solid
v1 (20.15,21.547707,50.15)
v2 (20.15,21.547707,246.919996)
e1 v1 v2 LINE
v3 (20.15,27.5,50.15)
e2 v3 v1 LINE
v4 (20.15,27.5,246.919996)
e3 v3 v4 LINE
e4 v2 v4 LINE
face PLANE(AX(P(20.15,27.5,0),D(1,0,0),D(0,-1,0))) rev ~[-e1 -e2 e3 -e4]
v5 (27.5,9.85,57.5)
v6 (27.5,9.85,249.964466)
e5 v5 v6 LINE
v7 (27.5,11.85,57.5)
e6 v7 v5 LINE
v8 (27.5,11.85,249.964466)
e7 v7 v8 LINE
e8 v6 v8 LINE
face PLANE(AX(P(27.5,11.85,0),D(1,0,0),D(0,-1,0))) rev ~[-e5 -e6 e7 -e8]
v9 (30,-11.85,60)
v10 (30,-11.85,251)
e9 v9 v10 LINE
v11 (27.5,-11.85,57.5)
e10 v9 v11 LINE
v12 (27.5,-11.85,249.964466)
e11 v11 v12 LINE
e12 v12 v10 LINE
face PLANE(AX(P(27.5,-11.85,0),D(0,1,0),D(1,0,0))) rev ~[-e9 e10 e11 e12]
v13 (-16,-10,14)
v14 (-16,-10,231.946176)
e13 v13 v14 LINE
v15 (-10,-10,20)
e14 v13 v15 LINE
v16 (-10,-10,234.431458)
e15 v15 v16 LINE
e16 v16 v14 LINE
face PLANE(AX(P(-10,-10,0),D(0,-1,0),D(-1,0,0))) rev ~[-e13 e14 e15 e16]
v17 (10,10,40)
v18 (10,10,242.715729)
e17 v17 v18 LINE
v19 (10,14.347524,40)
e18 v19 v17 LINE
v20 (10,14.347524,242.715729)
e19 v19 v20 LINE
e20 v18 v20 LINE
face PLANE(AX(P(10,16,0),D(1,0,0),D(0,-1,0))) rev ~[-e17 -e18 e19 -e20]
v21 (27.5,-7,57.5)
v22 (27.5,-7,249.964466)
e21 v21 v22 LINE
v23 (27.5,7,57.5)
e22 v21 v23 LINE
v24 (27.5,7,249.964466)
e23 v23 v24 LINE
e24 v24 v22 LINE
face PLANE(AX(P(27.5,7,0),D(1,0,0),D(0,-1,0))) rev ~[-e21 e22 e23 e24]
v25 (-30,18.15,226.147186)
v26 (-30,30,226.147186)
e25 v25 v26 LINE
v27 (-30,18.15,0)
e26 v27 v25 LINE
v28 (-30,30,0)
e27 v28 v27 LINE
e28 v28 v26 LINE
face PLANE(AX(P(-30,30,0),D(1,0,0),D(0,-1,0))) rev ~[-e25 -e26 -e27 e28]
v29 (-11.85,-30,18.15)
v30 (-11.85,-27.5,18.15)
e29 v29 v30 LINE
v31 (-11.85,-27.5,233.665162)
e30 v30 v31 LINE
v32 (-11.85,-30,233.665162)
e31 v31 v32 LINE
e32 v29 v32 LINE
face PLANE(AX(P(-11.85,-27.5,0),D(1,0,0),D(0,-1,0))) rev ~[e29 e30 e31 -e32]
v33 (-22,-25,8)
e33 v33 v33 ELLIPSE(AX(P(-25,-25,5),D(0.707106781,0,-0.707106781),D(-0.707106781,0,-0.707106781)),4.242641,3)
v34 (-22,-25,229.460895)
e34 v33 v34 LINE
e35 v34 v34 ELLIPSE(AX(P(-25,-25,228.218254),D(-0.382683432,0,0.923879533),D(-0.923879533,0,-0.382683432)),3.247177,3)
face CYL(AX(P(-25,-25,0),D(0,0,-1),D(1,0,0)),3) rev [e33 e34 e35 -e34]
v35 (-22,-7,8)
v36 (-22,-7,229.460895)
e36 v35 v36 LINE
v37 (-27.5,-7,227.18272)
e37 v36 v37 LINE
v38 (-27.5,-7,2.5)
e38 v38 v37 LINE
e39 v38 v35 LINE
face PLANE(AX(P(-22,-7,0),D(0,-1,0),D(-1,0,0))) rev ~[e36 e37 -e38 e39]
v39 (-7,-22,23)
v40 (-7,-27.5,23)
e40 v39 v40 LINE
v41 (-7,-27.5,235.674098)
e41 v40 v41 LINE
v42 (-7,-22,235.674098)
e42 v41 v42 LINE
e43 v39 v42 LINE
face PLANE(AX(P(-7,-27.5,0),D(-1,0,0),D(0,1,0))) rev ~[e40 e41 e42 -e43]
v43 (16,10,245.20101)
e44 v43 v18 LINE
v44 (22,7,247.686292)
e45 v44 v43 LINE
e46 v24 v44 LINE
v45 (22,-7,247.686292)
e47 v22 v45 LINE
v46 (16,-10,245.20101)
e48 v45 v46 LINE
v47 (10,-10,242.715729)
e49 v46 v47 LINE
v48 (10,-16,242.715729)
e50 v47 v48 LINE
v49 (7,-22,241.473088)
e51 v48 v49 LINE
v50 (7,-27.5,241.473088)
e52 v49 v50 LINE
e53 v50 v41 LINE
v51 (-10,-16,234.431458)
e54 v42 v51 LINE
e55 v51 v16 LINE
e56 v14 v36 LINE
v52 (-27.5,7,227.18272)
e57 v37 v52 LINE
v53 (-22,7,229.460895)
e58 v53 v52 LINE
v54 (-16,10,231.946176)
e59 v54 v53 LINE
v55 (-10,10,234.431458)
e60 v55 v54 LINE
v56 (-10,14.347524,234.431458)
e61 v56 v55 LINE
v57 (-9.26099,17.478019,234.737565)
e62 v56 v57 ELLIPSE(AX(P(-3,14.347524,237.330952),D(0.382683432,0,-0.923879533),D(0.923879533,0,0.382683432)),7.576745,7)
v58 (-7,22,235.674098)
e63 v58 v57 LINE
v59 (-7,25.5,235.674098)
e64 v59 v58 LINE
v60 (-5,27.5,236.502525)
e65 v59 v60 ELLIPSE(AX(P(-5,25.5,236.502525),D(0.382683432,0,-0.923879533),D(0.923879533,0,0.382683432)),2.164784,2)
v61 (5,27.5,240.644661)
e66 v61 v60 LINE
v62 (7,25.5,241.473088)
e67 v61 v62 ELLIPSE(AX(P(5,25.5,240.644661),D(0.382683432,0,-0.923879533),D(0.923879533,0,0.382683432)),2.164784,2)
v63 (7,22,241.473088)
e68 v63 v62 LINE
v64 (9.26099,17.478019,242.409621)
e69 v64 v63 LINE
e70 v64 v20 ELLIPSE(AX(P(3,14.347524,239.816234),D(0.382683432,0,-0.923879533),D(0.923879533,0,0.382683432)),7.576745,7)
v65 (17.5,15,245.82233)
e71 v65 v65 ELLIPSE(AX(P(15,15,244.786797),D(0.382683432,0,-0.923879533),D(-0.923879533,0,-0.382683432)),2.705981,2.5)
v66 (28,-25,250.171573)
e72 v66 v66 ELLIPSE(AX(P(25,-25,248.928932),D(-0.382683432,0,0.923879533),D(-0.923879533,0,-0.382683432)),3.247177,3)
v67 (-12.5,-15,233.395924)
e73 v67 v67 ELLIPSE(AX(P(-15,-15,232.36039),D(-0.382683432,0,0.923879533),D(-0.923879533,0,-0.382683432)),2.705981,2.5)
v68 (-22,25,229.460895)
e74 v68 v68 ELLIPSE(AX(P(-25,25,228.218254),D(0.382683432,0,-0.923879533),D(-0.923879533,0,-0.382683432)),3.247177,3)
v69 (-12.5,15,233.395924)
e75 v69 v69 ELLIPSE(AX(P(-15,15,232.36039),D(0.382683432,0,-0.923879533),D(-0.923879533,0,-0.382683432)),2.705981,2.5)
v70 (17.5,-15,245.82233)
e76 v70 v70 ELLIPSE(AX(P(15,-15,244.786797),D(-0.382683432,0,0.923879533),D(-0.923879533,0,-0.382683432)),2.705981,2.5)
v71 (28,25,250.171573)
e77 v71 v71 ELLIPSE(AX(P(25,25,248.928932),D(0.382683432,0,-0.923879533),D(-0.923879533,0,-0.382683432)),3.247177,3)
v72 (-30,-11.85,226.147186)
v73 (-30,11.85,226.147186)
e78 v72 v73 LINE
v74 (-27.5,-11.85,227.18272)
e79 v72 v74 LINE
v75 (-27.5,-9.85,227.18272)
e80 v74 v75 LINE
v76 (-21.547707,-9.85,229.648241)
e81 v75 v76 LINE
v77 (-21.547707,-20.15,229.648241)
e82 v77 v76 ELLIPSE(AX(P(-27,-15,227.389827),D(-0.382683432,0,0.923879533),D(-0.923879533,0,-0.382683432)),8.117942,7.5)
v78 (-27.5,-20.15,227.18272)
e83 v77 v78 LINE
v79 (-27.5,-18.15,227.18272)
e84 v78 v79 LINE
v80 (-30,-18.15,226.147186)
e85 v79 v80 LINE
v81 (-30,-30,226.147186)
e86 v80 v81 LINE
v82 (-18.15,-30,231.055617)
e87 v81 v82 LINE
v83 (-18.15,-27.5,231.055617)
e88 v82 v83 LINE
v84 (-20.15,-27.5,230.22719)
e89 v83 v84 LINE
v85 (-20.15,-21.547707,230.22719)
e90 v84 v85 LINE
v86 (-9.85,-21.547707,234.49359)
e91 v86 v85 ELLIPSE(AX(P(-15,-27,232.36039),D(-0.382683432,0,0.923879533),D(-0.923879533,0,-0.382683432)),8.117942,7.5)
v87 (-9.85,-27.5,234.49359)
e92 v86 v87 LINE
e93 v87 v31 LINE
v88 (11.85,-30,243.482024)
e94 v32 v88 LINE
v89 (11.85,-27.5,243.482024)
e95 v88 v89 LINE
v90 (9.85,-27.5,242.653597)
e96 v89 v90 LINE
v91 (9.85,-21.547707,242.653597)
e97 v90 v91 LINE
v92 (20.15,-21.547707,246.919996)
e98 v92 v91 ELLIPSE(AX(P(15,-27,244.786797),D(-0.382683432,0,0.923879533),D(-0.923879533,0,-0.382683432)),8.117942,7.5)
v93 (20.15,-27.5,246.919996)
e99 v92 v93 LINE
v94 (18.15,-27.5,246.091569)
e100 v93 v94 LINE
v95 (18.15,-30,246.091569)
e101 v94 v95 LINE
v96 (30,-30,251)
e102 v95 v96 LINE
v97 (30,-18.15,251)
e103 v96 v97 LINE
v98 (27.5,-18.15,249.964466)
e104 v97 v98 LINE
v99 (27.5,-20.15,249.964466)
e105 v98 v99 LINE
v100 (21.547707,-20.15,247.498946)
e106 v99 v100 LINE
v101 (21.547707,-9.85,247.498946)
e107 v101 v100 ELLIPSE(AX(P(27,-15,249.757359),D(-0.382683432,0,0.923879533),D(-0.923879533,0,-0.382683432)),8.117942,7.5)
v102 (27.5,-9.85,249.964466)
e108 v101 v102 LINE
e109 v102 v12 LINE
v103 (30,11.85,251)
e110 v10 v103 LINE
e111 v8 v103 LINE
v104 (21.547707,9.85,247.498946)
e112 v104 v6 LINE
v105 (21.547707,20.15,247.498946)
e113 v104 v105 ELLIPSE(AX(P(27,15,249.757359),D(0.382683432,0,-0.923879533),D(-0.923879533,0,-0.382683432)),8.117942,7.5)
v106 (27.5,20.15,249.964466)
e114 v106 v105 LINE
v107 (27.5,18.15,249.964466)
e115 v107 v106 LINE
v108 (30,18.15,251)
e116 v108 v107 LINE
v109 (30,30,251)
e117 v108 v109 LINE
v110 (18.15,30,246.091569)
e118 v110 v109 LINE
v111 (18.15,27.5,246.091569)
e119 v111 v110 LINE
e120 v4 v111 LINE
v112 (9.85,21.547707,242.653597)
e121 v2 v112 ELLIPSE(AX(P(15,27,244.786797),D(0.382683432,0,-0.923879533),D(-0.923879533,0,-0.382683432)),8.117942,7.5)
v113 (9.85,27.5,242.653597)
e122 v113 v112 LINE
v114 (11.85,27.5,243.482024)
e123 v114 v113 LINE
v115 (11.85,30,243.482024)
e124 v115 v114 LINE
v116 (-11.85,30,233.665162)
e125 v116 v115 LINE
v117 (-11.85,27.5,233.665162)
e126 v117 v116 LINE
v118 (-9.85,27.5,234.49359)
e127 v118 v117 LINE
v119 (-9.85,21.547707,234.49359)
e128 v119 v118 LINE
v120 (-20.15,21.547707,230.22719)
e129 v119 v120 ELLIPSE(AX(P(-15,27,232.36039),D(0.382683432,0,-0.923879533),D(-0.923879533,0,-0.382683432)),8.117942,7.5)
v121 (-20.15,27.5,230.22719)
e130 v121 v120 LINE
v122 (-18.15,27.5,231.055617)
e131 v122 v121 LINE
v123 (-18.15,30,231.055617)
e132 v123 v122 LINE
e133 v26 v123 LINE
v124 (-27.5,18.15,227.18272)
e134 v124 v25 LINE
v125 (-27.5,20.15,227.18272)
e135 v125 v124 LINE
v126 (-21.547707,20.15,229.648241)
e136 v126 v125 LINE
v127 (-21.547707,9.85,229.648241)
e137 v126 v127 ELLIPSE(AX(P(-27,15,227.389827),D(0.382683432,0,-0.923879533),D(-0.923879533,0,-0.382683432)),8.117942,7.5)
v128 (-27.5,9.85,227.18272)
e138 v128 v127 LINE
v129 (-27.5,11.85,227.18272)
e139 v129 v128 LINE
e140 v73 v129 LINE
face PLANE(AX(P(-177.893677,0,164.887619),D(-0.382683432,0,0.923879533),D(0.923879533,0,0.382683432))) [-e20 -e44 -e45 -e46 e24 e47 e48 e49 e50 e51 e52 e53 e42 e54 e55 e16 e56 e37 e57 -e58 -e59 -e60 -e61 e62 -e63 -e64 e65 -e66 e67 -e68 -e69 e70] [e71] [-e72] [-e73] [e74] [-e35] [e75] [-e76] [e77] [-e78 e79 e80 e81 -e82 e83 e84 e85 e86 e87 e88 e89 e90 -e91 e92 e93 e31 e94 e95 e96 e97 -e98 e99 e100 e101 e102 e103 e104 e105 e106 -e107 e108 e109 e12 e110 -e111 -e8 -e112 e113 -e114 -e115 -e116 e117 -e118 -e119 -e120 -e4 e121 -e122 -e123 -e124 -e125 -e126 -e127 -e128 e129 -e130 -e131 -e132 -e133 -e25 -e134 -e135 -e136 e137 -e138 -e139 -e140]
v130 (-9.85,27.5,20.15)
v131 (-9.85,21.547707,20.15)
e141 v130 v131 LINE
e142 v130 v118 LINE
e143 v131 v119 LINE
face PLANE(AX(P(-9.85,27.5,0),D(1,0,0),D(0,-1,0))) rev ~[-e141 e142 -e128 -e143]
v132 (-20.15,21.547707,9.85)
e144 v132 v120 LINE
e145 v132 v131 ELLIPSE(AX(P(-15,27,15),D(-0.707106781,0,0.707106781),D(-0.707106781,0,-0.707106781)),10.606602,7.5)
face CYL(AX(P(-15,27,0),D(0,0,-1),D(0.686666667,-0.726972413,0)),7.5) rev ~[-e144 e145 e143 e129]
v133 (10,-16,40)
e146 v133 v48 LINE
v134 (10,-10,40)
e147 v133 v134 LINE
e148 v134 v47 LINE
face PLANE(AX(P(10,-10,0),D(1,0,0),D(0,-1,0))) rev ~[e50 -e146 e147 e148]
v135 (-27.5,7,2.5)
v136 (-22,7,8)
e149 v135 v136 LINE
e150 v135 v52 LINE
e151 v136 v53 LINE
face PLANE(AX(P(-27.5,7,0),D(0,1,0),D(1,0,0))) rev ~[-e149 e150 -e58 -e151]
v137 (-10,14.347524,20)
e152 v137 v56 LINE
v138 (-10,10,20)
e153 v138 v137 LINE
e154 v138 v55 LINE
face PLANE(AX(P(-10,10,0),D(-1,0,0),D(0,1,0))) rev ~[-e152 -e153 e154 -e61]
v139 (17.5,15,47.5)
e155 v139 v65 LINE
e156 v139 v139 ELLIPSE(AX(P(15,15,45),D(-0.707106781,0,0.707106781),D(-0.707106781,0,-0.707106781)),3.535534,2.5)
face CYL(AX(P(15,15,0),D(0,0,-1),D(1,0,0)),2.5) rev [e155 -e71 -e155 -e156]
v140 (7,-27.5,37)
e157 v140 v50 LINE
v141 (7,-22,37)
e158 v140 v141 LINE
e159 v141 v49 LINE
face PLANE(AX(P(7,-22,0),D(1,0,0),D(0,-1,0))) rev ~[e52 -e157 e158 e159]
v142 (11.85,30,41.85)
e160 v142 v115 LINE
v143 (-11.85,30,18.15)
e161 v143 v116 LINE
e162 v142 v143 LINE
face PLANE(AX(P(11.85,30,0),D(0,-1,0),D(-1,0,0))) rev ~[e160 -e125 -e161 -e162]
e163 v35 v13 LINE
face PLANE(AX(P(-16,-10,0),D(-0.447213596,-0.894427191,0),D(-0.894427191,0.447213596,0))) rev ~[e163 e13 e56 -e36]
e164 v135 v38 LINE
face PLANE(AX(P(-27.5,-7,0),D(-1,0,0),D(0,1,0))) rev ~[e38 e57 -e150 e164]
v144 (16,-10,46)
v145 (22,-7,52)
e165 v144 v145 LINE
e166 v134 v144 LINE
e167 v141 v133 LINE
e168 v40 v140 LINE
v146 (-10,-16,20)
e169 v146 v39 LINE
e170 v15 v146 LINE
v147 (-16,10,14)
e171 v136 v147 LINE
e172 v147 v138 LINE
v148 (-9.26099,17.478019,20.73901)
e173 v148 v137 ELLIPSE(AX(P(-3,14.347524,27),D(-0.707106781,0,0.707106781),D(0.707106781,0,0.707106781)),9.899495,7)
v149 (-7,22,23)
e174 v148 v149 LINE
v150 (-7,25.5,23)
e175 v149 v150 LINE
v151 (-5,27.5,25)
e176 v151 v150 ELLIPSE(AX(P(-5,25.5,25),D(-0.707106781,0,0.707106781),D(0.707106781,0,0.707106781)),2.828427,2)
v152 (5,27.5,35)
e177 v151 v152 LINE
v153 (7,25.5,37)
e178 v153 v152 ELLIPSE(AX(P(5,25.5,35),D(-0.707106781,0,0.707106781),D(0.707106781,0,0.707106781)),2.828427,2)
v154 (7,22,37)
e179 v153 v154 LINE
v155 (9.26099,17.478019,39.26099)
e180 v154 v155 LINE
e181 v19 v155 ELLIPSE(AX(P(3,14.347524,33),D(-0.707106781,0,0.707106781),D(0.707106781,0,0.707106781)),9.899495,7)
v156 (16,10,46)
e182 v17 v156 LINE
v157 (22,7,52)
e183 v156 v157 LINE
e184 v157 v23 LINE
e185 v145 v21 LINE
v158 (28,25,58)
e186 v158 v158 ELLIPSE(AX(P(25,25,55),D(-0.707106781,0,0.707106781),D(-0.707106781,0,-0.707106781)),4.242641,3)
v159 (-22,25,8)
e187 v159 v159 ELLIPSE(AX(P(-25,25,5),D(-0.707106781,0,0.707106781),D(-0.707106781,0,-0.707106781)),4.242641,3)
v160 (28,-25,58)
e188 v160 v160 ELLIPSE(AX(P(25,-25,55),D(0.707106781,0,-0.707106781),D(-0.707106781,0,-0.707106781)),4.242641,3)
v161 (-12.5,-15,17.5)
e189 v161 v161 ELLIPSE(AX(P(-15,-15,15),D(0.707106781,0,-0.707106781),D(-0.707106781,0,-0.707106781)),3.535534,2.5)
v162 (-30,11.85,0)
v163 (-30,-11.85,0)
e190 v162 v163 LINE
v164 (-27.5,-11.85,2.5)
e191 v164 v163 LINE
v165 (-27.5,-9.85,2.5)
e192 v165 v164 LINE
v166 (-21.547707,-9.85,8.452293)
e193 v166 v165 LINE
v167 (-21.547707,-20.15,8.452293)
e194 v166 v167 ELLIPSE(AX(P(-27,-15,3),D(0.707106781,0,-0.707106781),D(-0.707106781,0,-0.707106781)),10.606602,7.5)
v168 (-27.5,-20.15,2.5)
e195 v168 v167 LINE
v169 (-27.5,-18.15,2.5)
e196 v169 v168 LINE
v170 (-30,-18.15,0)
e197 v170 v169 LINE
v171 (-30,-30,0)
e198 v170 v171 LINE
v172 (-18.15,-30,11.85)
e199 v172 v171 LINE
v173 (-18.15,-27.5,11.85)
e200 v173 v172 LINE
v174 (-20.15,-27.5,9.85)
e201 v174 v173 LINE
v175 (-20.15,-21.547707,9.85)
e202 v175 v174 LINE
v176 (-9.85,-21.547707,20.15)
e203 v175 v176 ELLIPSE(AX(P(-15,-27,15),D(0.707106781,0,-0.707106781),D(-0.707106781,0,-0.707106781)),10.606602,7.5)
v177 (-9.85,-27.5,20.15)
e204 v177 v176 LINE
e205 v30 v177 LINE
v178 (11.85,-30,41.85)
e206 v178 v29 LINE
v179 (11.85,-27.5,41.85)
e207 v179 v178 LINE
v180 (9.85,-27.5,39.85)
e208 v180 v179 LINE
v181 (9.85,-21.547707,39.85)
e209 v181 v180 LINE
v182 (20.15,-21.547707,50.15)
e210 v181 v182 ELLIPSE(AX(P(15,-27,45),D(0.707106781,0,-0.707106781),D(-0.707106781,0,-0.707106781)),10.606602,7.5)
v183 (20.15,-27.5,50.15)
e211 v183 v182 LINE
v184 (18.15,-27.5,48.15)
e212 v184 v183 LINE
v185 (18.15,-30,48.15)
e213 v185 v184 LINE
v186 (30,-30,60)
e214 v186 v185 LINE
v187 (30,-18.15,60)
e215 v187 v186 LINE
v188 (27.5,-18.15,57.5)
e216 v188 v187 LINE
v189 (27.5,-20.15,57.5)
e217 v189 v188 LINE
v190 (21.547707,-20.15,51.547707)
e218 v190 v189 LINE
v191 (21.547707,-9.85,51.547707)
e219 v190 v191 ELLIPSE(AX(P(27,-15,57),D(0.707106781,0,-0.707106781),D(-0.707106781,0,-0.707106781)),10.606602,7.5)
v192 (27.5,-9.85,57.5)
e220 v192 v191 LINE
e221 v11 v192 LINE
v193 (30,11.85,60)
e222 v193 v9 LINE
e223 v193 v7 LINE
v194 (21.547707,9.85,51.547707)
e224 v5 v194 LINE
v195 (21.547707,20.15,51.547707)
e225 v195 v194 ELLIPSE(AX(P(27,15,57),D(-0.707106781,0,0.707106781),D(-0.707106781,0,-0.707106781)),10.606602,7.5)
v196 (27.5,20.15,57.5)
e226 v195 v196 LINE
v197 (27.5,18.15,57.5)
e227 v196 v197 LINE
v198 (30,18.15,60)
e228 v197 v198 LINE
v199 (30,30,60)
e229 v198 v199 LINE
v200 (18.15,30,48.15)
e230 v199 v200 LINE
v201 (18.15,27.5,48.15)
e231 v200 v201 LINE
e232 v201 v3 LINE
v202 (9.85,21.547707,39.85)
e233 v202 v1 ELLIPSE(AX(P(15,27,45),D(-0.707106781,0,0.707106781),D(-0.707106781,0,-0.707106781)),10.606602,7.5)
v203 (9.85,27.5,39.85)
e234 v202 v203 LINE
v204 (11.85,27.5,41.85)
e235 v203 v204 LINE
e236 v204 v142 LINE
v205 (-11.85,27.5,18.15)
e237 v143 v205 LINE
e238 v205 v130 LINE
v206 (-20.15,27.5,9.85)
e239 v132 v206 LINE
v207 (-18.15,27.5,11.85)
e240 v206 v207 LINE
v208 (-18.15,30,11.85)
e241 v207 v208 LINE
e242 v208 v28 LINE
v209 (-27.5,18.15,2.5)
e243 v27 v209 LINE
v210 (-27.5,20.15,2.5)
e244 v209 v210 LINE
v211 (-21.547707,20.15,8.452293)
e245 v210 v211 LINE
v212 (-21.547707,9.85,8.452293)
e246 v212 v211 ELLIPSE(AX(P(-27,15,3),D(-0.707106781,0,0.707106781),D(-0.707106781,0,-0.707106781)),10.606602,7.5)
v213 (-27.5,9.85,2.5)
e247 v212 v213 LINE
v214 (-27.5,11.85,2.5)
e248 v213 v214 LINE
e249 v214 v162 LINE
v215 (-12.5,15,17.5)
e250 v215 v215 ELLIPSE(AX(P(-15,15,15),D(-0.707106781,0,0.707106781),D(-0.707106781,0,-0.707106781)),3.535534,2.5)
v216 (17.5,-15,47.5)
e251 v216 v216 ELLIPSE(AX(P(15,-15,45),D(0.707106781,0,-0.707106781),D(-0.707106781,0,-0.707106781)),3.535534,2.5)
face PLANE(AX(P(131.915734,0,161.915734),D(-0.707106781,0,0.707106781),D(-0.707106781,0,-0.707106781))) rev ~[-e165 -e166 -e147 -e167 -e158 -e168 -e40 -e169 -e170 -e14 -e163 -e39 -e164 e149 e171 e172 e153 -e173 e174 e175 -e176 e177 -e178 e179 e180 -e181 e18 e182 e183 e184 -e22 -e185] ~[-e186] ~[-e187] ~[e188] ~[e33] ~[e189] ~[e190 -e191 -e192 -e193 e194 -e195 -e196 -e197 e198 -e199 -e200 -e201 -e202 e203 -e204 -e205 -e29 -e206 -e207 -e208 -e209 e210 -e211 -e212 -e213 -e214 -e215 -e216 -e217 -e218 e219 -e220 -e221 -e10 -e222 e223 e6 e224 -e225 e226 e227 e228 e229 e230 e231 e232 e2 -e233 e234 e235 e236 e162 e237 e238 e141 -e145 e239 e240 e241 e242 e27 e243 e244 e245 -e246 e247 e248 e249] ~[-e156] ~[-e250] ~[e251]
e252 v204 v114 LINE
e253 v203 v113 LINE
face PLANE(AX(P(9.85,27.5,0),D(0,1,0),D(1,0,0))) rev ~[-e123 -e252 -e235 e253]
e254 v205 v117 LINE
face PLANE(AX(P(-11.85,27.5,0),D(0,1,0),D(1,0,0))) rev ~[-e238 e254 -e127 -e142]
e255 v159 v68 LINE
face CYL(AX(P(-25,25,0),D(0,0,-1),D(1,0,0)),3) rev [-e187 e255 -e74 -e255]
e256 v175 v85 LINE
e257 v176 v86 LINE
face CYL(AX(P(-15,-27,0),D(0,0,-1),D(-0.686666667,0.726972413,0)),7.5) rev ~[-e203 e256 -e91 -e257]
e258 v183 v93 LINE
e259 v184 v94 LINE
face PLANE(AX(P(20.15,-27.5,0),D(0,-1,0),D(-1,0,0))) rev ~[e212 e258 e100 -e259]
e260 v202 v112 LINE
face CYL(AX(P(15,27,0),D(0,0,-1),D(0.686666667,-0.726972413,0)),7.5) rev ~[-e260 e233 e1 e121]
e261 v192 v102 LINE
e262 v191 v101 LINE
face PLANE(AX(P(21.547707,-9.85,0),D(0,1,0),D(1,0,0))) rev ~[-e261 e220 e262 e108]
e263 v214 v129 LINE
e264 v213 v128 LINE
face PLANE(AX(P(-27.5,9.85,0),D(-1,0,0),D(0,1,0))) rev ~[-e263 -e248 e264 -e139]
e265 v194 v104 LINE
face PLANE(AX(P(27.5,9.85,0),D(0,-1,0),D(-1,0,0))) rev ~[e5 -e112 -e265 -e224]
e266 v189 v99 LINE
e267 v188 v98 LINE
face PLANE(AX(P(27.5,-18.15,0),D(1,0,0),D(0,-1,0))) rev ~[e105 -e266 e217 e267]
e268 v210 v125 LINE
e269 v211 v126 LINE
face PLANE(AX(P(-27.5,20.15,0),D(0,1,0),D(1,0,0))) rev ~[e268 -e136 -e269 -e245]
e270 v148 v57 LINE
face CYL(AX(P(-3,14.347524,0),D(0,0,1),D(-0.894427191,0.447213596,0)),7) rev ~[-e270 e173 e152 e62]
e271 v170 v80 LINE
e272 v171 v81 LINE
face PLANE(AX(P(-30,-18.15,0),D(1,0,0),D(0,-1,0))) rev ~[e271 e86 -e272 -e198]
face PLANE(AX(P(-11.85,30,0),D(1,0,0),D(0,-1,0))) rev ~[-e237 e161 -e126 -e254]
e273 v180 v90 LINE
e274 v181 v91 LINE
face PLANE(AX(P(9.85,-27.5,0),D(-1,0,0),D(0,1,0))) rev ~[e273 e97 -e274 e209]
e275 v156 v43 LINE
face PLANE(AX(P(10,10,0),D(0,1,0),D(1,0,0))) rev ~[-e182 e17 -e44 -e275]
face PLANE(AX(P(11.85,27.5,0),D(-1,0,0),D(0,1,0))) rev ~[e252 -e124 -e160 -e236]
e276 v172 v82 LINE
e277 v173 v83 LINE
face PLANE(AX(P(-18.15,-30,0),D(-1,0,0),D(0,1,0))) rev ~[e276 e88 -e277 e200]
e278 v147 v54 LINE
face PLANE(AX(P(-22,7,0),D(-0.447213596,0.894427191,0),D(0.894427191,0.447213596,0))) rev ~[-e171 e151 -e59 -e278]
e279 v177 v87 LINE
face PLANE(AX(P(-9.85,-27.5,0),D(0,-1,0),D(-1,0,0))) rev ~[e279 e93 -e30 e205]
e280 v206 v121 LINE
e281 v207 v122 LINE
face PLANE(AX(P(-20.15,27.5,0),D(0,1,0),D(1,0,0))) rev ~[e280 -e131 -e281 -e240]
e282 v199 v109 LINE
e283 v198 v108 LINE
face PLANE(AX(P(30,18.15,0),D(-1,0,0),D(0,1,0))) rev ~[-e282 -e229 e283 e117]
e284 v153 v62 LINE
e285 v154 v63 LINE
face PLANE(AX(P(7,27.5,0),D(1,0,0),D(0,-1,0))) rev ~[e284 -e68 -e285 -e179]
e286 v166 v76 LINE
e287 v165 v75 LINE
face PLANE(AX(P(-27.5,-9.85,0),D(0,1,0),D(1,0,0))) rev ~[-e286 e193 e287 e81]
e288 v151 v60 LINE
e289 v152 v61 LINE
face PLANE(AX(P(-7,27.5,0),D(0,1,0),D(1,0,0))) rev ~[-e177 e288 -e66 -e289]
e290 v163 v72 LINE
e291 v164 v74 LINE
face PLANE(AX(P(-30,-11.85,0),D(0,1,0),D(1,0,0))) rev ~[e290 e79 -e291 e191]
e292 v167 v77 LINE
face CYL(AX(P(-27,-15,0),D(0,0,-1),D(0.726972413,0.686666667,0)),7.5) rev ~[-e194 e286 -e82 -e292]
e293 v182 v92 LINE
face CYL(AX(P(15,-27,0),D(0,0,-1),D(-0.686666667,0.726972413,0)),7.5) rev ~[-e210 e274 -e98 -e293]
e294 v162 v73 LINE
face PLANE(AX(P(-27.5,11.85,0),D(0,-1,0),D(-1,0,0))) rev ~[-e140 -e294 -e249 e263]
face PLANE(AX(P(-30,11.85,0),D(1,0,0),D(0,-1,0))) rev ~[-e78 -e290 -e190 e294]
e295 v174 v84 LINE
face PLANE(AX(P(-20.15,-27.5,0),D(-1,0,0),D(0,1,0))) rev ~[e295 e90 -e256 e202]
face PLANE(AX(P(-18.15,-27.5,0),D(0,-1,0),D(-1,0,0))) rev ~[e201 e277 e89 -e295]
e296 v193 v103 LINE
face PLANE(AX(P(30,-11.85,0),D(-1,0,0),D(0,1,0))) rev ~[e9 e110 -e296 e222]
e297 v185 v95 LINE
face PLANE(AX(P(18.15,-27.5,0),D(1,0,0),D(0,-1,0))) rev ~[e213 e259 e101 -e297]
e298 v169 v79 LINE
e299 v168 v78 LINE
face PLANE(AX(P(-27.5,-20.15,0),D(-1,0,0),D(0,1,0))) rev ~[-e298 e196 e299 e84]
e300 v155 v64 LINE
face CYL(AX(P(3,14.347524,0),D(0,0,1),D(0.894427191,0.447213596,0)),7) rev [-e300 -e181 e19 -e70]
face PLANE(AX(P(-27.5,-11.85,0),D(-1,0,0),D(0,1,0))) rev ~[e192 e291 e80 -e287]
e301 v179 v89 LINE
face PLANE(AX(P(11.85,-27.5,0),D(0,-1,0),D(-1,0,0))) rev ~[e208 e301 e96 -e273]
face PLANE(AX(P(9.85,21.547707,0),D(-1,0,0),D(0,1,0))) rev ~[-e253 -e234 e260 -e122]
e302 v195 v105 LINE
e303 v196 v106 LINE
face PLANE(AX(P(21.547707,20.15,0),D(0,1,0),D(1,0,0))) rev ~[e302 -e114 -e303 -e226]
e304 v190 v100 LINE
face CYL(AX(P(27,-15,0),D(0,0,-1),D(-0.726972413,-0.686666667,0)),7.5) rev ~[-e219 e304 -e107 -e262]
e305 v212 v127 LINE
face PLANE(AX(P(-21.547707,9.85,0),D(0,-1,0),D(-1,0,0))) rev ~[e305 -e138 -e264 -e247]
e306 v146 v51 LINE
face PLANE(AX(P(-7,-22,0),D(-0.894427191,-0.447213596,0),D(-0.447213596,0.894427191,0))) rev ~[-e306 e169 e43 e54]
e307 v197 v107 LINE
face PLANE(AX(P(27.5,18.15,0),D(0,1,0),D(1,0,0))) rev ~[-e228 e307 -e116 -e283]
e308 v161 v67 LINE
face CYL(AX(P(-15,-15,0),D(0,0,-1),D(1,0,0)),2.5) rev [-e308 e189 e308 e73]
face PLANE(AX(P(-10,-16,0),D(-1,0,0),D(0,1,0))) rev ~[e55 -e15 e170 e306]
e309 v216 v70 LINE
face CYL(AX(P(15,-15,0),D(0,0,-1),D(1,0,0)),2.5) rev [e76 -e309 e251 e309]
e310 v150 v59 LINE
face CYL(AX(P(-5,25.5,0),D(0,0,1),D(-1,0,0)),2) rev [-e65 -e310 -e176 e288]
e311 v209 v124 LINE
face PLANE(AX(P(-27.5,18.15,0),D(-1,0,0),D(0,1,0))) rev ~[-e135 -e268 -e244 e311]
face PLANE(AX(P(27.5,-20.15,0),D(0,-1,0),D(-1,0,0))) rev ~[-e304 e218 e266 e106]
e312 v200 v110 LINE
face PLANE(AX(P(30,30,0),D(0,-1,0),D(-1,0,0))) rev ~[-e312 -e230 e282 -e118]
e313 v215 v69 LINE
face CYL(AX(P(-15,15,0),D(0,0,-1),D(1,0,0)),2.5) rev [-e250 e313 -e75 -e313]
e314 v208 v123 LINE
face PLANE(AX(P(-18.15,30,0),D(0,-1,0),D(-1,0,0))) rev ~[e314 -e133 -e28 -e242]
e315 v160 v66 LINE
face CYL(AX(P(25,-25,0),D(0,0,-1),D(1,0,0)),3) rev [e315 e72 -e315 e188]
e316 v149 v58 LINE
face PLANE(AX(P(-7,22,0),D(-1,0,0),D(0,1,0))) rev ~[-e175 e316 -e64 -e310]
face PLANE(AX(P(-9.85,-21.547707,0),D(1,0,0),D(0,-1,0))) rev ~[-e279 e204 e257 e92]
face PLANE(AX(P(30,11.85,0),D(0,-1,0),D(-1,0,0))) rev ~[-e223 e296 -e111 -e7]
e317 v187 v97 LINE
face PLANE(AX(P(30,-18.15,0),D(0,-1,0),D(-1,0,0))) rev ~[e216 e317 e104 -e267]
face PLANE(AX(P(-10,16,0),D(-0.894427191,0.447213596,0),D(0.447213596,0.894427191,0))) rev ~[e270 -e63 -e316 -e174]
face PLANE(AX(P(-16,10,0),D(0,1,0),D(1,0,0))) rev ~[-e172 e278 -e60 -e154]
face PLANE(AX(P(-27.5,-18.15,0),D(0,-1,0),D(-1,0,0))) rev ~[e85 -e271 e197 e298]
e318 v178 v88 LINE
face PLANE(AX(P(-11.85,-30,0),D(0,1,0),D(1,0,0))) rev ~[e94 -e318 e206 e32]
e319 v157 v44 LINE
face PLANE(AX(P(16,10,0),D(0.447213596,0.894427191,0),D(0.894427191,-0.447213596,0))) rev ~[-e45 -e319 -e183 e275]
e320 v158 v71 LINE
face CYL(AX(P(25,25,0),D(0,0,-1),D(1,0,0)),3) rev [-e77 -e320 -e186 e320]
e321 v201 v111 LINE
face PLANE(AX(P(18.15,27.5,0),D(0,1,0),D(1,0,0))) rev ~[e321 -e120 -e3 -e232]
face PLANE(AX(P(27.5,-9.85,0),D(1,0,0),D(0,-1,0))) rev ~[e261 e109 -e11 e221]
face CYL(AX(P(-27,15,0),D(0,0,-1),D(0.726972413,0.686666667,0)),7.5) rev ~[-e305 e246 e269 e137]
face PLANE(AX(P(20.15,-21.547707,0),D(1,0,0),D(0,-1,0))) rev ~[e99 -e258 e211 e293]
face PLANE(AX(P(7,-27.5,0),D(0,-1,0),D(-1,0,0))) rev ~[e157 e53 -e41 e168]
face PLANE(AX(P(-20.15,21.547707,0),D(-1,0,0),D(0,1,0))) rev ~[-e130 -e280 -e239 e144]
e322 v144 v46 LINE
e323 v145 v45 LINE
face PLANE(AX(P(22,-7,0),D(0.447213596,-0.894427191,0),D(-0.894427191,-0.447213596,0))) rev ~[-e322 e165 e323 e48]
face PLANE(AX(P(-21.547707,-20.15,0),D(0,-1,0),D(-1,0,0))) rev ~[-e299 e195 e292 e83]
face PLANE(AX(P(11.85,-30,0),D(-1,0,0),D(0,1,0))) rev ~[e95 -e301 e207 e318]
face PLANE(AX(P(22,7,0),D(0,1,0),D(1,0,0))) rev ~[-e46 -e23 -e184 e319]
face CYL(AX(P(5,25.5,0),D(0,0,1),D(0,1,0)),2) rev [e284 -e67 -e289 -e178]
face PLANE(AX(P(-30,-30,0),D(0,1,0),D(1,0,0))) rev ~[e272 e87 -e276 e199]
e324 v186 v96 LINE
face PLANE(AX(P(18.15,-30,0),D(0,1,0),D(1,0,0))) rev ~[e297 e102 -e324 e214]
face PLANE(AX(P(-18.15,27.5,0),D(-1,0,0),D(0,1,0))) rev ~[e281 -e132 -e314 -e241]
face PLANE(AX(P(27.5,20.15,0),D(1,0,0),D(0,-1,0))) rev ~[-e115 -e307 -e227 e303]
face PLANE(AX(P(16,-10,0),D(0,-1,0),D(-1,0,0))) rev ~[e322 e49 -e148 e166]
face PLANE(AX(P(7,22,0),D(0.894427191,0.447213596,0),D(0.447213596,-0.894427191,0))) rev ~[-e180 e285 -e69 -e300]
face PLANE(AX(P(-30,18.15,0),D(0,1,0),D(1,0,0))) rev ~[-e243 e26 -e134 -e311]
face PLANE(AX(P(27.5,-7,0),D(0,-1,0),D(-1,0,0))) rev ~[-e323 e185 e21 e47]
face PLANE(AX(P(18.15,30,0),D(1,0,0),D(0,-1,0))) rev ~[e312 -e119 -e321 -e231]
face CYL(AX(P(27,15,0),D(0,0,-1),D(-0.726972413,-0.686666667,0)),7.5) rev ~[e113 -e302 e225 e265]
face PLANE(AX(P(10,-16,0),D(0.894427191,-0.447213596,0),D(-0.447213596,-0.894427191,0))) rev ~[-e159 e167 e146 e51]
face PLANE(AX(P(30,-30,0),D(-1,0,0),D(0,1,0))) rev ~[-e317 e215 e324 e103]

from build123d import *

# Parameters (mm, degrees)
F0_R          = 3
F0_R_2        = 2.5
F1_DEPTH      = 251
F2_R          = 2
F3_R          = 7
F6_DEPTH      = 30
F6_DEPTH_BACK = 30


# Not quite as in the source:
# - a feature names something its author has since deleted; it is built from what else it names


with BuildPart() as f1:
    # F0 (on Top) → F1 (new body)
    with BuildSketch(Plane.XY):
        with BuildLine():
            Line((18.15, -30), (30, -30))
            Line((30, -30), (30, -18.15))
            Line((30, -18.15), (27.5, -18.15))
            Line((27.5, -18.15), (27.5, -20.15))
            Line((27.5, -20.15), (21.5477069044, -20.15))
            ThreePointArc((21.5477069044, -20.15), (19.5, -15), (21.5477069044, -9.85))
            Line((21.5477069044, -9.85), (27.5, -9.85))
            Line((27.5, -9.85), (27.5, -11.85))
            Line((27.5, -11.85), (30, -11.85))
            Line((30, -11.85), (30, 11.85))
            Line((30, 11.85), (27.5, 11.85))
            Line((27.5, 11.85), (27.5, 9.85))
            Line((27.5, 9.85), (21.5477069044, 9.85))
            ThreePointArc((21.5477069044, 9.85), (19.5, 15), (21.5477069044, 20.15))
            Line((21.5477069044, 20.15), (27.5, 20.15))
            Line((27.5, 20.15), (27.5, 18.15))
            Line((27.5, 18.15), (30, 18.15))
            Line((30, 18.15), (30, 30))
            Line((30, 30), (18.15, 30))
            Line((18.15, 30), (18.15, 27.5))
            Line((18.15, 27.5), (20.15, 27.5))
            Line((20.15, 27.5), (20.15, 21.5477069044))
            ThreePointArc((20.15, 21.5477069044), (15, 19.5), (9.85, 21.5477069044))
            Line((9.85, 21.5477069044), (9.85, 27.5))
            Line((9.85, 27.5), (11.85, 27.5))
            Line((11.85, 27.5), (11.85, 30))
            Line((11.85, 30), (-11.85, 30))
            Line((-11.85, 30), (-11.85, 27.5))
            Line((-11.85, 27.5), (-9.85, 27.5))
            Line((-9.85, 27.5), (-9.85, 21.5477069044))
            ThreePointArc((-9.85, 21.5477069044), (-15, 19.5), (-20.15, 21.5477069044))
            Line((-20.15, 21.5477069044), (-20.15, 27.5))
            Line((-20.15, 27.5), (-18.15, 27.5))
            Line((-18.15, 27.5), (-18.15, 30))
            Line((-18.15, 30), (-30, 30))
            Line((-30, 30), (-30, 18.15))
            Line((-30, 18.15), (-27.5, 18.15))
            Line((-27.5, 18.15), (-27.5, 20.15))
            Line((-27.5, 20.15), (-21.5477069044, 20.15))
            ThreePointArc((-21.5477069044, 20.15), (-19.5, 15), (-21.5477069044, 9.85))
            Line((-21.5477069044, 9.85), (-27.5, 9.85))
            Line((-27.5, 9.85), (-27.5, 11.85))
            Line((-27.5, 11.85), (-30, 11.85))
            Line((-30, 11.85), (-30, -11.85))
            Line((-30, -11.85), (-27.5, -11.85))
            Line((-27.5, -11.85), (-27.5, -9.85))
            Line((-27.5, -9.85), (-21.5477069044, -9.85))
            ThreePointArc((-21.5477069044, -9.85), (-19.5, -15), (-21.5477069044, -20.15))
            Line((-21.5477069044, -20.15), (-27.5, -20.15))
            Line((-27.5, -20.15), (-27.5, -18.15))
            Line((-27.5, -18.15), (-30, -18.15))
            Line((-30, -18.15), (-30, -30))
            Line((-30, -30), (-18.15, -30))
            Line((-18.15, -30), (-18.15, -27.5))
            Line((-18.15, -27.5), (-20.15, -27.5))
            Line((-20.15, -27.5), (-20.15, -21.5477069044))
            ThreePointArc((-20.15, -21.5477069044), (-15, -19.5), (-9.85, -21.5477069044))
            Line((-9.85, -21.5477069044), (-9.85, -27.5))
            Line((-9.85, -27.5), (-11.85, -27.5))
            Line((-11.85, -27.5), (-11.85, -30))
            Line((-11.85, -30), (11.85, -30))
            Line((11.85, -30), (11.85, -27.5))
            Line((11.85, -27.5), (9.85, -27.5))
            Line((9.85, -27.5), (9.85, -21.5477069044))
            ThreePointArc((9.85, -21.5477069044), (15, -19.5), (20.15, -21.5477069044))
            Line((20.15, -21.5477069044), (20.15, -27.5))
            Line((20.15, -27.5), (18.15, -27.5))
            Line((18.15, -27.5), (18.15, -30))
        make_face()
        with Locations((-25, -25)):
            Circle(F0_R, mode=Mode.SUBTRACT)
        with Locations((-15, -15)):
            Circle(F0_R_2, mode=Mode.SUBTRACT)
        with Locations((25, -25)):
            Circle(F0_R, mode=Mode.SUBTRACT)
        with Locations((15, -15)):
            Circle(F0_R_2, mode=Mode.SUBTRACT)
        with Locations((-25, 25)):
            Circle(F0_R, mode=Mode.SUBTRACT)
        with Locations((-15, 15)):
            Circle(F0_R_2, mode=Mode.SUBTRACT)
        Polygon((-7, 22), (-7, 27.5), (0, 27.5), (7, 27.5), (7, 22), (10, 16), (10, 10), (16, 10), (22, 7), (27.5, 7), (27.5, 0), (27.5, -7), (22, -7), (16, -10), (10, -10), (10, -16), (7, -22), (7, -27.5), (0, -27.5), (-7, -27.5), (-7, -22), (-10, -16), (-10, -10), (-16, -10), (-22, -7), (-27.5, -7), (-27.5, 0), (-27.5, 7), (-22, 7), (-16, 10), (-10, 10), (-10, 16), align=None, mode=Mode.SUBTRACT)
        with Locations((15, 15)):
            Circle(F0_R_2, mode=Mode.SUBTRACT)
        with Locations((25, 25)):
            Circle(F0_R, mode=Mode.SUBTRACT)
    extrude(amount=F1_DEPTH)

    # F2
    f2_edges = [f1.edges().sort_by_distance(p)[0] for p in [
        (-7, 27.5, 125.5),
        (7, 27.5, 125.5),
    ]]
    fillet(f2_edges, radius=F2_R)

    # F3
    f3_edges = [f1.edges().sort_by_distance(p)[0] for p in [
        (-10, 16, 125.5),
        (10, 16, 125.5),
    ]]
    fillet(f3_edges, radius=F3_R)

    # F5 (on Front) → F6 (cut, two sides)
    with BuildSketch(Plane.XZ) as f6_sk:
        Polygon((-177.8936772938, 164.8876193333), (30, 251), (-52.9032198334, 451.1460776863), (-260.7968971272, 365.0336970195), align=None)
        Polygon((247.13668536, 46.6947819077), (131.9157336339, 161.9157336339), (-30, 0), (85.2209517261, -115.2209517261), align=None)
    extrude(amount=F6_DEPTH, mode=Mode.SUBTRACT)
    extrude(f6_sk.sketch, amount=-F6_DEPTH_BACK, mode=Mode.SUBTRACT)


solid = f1.part
